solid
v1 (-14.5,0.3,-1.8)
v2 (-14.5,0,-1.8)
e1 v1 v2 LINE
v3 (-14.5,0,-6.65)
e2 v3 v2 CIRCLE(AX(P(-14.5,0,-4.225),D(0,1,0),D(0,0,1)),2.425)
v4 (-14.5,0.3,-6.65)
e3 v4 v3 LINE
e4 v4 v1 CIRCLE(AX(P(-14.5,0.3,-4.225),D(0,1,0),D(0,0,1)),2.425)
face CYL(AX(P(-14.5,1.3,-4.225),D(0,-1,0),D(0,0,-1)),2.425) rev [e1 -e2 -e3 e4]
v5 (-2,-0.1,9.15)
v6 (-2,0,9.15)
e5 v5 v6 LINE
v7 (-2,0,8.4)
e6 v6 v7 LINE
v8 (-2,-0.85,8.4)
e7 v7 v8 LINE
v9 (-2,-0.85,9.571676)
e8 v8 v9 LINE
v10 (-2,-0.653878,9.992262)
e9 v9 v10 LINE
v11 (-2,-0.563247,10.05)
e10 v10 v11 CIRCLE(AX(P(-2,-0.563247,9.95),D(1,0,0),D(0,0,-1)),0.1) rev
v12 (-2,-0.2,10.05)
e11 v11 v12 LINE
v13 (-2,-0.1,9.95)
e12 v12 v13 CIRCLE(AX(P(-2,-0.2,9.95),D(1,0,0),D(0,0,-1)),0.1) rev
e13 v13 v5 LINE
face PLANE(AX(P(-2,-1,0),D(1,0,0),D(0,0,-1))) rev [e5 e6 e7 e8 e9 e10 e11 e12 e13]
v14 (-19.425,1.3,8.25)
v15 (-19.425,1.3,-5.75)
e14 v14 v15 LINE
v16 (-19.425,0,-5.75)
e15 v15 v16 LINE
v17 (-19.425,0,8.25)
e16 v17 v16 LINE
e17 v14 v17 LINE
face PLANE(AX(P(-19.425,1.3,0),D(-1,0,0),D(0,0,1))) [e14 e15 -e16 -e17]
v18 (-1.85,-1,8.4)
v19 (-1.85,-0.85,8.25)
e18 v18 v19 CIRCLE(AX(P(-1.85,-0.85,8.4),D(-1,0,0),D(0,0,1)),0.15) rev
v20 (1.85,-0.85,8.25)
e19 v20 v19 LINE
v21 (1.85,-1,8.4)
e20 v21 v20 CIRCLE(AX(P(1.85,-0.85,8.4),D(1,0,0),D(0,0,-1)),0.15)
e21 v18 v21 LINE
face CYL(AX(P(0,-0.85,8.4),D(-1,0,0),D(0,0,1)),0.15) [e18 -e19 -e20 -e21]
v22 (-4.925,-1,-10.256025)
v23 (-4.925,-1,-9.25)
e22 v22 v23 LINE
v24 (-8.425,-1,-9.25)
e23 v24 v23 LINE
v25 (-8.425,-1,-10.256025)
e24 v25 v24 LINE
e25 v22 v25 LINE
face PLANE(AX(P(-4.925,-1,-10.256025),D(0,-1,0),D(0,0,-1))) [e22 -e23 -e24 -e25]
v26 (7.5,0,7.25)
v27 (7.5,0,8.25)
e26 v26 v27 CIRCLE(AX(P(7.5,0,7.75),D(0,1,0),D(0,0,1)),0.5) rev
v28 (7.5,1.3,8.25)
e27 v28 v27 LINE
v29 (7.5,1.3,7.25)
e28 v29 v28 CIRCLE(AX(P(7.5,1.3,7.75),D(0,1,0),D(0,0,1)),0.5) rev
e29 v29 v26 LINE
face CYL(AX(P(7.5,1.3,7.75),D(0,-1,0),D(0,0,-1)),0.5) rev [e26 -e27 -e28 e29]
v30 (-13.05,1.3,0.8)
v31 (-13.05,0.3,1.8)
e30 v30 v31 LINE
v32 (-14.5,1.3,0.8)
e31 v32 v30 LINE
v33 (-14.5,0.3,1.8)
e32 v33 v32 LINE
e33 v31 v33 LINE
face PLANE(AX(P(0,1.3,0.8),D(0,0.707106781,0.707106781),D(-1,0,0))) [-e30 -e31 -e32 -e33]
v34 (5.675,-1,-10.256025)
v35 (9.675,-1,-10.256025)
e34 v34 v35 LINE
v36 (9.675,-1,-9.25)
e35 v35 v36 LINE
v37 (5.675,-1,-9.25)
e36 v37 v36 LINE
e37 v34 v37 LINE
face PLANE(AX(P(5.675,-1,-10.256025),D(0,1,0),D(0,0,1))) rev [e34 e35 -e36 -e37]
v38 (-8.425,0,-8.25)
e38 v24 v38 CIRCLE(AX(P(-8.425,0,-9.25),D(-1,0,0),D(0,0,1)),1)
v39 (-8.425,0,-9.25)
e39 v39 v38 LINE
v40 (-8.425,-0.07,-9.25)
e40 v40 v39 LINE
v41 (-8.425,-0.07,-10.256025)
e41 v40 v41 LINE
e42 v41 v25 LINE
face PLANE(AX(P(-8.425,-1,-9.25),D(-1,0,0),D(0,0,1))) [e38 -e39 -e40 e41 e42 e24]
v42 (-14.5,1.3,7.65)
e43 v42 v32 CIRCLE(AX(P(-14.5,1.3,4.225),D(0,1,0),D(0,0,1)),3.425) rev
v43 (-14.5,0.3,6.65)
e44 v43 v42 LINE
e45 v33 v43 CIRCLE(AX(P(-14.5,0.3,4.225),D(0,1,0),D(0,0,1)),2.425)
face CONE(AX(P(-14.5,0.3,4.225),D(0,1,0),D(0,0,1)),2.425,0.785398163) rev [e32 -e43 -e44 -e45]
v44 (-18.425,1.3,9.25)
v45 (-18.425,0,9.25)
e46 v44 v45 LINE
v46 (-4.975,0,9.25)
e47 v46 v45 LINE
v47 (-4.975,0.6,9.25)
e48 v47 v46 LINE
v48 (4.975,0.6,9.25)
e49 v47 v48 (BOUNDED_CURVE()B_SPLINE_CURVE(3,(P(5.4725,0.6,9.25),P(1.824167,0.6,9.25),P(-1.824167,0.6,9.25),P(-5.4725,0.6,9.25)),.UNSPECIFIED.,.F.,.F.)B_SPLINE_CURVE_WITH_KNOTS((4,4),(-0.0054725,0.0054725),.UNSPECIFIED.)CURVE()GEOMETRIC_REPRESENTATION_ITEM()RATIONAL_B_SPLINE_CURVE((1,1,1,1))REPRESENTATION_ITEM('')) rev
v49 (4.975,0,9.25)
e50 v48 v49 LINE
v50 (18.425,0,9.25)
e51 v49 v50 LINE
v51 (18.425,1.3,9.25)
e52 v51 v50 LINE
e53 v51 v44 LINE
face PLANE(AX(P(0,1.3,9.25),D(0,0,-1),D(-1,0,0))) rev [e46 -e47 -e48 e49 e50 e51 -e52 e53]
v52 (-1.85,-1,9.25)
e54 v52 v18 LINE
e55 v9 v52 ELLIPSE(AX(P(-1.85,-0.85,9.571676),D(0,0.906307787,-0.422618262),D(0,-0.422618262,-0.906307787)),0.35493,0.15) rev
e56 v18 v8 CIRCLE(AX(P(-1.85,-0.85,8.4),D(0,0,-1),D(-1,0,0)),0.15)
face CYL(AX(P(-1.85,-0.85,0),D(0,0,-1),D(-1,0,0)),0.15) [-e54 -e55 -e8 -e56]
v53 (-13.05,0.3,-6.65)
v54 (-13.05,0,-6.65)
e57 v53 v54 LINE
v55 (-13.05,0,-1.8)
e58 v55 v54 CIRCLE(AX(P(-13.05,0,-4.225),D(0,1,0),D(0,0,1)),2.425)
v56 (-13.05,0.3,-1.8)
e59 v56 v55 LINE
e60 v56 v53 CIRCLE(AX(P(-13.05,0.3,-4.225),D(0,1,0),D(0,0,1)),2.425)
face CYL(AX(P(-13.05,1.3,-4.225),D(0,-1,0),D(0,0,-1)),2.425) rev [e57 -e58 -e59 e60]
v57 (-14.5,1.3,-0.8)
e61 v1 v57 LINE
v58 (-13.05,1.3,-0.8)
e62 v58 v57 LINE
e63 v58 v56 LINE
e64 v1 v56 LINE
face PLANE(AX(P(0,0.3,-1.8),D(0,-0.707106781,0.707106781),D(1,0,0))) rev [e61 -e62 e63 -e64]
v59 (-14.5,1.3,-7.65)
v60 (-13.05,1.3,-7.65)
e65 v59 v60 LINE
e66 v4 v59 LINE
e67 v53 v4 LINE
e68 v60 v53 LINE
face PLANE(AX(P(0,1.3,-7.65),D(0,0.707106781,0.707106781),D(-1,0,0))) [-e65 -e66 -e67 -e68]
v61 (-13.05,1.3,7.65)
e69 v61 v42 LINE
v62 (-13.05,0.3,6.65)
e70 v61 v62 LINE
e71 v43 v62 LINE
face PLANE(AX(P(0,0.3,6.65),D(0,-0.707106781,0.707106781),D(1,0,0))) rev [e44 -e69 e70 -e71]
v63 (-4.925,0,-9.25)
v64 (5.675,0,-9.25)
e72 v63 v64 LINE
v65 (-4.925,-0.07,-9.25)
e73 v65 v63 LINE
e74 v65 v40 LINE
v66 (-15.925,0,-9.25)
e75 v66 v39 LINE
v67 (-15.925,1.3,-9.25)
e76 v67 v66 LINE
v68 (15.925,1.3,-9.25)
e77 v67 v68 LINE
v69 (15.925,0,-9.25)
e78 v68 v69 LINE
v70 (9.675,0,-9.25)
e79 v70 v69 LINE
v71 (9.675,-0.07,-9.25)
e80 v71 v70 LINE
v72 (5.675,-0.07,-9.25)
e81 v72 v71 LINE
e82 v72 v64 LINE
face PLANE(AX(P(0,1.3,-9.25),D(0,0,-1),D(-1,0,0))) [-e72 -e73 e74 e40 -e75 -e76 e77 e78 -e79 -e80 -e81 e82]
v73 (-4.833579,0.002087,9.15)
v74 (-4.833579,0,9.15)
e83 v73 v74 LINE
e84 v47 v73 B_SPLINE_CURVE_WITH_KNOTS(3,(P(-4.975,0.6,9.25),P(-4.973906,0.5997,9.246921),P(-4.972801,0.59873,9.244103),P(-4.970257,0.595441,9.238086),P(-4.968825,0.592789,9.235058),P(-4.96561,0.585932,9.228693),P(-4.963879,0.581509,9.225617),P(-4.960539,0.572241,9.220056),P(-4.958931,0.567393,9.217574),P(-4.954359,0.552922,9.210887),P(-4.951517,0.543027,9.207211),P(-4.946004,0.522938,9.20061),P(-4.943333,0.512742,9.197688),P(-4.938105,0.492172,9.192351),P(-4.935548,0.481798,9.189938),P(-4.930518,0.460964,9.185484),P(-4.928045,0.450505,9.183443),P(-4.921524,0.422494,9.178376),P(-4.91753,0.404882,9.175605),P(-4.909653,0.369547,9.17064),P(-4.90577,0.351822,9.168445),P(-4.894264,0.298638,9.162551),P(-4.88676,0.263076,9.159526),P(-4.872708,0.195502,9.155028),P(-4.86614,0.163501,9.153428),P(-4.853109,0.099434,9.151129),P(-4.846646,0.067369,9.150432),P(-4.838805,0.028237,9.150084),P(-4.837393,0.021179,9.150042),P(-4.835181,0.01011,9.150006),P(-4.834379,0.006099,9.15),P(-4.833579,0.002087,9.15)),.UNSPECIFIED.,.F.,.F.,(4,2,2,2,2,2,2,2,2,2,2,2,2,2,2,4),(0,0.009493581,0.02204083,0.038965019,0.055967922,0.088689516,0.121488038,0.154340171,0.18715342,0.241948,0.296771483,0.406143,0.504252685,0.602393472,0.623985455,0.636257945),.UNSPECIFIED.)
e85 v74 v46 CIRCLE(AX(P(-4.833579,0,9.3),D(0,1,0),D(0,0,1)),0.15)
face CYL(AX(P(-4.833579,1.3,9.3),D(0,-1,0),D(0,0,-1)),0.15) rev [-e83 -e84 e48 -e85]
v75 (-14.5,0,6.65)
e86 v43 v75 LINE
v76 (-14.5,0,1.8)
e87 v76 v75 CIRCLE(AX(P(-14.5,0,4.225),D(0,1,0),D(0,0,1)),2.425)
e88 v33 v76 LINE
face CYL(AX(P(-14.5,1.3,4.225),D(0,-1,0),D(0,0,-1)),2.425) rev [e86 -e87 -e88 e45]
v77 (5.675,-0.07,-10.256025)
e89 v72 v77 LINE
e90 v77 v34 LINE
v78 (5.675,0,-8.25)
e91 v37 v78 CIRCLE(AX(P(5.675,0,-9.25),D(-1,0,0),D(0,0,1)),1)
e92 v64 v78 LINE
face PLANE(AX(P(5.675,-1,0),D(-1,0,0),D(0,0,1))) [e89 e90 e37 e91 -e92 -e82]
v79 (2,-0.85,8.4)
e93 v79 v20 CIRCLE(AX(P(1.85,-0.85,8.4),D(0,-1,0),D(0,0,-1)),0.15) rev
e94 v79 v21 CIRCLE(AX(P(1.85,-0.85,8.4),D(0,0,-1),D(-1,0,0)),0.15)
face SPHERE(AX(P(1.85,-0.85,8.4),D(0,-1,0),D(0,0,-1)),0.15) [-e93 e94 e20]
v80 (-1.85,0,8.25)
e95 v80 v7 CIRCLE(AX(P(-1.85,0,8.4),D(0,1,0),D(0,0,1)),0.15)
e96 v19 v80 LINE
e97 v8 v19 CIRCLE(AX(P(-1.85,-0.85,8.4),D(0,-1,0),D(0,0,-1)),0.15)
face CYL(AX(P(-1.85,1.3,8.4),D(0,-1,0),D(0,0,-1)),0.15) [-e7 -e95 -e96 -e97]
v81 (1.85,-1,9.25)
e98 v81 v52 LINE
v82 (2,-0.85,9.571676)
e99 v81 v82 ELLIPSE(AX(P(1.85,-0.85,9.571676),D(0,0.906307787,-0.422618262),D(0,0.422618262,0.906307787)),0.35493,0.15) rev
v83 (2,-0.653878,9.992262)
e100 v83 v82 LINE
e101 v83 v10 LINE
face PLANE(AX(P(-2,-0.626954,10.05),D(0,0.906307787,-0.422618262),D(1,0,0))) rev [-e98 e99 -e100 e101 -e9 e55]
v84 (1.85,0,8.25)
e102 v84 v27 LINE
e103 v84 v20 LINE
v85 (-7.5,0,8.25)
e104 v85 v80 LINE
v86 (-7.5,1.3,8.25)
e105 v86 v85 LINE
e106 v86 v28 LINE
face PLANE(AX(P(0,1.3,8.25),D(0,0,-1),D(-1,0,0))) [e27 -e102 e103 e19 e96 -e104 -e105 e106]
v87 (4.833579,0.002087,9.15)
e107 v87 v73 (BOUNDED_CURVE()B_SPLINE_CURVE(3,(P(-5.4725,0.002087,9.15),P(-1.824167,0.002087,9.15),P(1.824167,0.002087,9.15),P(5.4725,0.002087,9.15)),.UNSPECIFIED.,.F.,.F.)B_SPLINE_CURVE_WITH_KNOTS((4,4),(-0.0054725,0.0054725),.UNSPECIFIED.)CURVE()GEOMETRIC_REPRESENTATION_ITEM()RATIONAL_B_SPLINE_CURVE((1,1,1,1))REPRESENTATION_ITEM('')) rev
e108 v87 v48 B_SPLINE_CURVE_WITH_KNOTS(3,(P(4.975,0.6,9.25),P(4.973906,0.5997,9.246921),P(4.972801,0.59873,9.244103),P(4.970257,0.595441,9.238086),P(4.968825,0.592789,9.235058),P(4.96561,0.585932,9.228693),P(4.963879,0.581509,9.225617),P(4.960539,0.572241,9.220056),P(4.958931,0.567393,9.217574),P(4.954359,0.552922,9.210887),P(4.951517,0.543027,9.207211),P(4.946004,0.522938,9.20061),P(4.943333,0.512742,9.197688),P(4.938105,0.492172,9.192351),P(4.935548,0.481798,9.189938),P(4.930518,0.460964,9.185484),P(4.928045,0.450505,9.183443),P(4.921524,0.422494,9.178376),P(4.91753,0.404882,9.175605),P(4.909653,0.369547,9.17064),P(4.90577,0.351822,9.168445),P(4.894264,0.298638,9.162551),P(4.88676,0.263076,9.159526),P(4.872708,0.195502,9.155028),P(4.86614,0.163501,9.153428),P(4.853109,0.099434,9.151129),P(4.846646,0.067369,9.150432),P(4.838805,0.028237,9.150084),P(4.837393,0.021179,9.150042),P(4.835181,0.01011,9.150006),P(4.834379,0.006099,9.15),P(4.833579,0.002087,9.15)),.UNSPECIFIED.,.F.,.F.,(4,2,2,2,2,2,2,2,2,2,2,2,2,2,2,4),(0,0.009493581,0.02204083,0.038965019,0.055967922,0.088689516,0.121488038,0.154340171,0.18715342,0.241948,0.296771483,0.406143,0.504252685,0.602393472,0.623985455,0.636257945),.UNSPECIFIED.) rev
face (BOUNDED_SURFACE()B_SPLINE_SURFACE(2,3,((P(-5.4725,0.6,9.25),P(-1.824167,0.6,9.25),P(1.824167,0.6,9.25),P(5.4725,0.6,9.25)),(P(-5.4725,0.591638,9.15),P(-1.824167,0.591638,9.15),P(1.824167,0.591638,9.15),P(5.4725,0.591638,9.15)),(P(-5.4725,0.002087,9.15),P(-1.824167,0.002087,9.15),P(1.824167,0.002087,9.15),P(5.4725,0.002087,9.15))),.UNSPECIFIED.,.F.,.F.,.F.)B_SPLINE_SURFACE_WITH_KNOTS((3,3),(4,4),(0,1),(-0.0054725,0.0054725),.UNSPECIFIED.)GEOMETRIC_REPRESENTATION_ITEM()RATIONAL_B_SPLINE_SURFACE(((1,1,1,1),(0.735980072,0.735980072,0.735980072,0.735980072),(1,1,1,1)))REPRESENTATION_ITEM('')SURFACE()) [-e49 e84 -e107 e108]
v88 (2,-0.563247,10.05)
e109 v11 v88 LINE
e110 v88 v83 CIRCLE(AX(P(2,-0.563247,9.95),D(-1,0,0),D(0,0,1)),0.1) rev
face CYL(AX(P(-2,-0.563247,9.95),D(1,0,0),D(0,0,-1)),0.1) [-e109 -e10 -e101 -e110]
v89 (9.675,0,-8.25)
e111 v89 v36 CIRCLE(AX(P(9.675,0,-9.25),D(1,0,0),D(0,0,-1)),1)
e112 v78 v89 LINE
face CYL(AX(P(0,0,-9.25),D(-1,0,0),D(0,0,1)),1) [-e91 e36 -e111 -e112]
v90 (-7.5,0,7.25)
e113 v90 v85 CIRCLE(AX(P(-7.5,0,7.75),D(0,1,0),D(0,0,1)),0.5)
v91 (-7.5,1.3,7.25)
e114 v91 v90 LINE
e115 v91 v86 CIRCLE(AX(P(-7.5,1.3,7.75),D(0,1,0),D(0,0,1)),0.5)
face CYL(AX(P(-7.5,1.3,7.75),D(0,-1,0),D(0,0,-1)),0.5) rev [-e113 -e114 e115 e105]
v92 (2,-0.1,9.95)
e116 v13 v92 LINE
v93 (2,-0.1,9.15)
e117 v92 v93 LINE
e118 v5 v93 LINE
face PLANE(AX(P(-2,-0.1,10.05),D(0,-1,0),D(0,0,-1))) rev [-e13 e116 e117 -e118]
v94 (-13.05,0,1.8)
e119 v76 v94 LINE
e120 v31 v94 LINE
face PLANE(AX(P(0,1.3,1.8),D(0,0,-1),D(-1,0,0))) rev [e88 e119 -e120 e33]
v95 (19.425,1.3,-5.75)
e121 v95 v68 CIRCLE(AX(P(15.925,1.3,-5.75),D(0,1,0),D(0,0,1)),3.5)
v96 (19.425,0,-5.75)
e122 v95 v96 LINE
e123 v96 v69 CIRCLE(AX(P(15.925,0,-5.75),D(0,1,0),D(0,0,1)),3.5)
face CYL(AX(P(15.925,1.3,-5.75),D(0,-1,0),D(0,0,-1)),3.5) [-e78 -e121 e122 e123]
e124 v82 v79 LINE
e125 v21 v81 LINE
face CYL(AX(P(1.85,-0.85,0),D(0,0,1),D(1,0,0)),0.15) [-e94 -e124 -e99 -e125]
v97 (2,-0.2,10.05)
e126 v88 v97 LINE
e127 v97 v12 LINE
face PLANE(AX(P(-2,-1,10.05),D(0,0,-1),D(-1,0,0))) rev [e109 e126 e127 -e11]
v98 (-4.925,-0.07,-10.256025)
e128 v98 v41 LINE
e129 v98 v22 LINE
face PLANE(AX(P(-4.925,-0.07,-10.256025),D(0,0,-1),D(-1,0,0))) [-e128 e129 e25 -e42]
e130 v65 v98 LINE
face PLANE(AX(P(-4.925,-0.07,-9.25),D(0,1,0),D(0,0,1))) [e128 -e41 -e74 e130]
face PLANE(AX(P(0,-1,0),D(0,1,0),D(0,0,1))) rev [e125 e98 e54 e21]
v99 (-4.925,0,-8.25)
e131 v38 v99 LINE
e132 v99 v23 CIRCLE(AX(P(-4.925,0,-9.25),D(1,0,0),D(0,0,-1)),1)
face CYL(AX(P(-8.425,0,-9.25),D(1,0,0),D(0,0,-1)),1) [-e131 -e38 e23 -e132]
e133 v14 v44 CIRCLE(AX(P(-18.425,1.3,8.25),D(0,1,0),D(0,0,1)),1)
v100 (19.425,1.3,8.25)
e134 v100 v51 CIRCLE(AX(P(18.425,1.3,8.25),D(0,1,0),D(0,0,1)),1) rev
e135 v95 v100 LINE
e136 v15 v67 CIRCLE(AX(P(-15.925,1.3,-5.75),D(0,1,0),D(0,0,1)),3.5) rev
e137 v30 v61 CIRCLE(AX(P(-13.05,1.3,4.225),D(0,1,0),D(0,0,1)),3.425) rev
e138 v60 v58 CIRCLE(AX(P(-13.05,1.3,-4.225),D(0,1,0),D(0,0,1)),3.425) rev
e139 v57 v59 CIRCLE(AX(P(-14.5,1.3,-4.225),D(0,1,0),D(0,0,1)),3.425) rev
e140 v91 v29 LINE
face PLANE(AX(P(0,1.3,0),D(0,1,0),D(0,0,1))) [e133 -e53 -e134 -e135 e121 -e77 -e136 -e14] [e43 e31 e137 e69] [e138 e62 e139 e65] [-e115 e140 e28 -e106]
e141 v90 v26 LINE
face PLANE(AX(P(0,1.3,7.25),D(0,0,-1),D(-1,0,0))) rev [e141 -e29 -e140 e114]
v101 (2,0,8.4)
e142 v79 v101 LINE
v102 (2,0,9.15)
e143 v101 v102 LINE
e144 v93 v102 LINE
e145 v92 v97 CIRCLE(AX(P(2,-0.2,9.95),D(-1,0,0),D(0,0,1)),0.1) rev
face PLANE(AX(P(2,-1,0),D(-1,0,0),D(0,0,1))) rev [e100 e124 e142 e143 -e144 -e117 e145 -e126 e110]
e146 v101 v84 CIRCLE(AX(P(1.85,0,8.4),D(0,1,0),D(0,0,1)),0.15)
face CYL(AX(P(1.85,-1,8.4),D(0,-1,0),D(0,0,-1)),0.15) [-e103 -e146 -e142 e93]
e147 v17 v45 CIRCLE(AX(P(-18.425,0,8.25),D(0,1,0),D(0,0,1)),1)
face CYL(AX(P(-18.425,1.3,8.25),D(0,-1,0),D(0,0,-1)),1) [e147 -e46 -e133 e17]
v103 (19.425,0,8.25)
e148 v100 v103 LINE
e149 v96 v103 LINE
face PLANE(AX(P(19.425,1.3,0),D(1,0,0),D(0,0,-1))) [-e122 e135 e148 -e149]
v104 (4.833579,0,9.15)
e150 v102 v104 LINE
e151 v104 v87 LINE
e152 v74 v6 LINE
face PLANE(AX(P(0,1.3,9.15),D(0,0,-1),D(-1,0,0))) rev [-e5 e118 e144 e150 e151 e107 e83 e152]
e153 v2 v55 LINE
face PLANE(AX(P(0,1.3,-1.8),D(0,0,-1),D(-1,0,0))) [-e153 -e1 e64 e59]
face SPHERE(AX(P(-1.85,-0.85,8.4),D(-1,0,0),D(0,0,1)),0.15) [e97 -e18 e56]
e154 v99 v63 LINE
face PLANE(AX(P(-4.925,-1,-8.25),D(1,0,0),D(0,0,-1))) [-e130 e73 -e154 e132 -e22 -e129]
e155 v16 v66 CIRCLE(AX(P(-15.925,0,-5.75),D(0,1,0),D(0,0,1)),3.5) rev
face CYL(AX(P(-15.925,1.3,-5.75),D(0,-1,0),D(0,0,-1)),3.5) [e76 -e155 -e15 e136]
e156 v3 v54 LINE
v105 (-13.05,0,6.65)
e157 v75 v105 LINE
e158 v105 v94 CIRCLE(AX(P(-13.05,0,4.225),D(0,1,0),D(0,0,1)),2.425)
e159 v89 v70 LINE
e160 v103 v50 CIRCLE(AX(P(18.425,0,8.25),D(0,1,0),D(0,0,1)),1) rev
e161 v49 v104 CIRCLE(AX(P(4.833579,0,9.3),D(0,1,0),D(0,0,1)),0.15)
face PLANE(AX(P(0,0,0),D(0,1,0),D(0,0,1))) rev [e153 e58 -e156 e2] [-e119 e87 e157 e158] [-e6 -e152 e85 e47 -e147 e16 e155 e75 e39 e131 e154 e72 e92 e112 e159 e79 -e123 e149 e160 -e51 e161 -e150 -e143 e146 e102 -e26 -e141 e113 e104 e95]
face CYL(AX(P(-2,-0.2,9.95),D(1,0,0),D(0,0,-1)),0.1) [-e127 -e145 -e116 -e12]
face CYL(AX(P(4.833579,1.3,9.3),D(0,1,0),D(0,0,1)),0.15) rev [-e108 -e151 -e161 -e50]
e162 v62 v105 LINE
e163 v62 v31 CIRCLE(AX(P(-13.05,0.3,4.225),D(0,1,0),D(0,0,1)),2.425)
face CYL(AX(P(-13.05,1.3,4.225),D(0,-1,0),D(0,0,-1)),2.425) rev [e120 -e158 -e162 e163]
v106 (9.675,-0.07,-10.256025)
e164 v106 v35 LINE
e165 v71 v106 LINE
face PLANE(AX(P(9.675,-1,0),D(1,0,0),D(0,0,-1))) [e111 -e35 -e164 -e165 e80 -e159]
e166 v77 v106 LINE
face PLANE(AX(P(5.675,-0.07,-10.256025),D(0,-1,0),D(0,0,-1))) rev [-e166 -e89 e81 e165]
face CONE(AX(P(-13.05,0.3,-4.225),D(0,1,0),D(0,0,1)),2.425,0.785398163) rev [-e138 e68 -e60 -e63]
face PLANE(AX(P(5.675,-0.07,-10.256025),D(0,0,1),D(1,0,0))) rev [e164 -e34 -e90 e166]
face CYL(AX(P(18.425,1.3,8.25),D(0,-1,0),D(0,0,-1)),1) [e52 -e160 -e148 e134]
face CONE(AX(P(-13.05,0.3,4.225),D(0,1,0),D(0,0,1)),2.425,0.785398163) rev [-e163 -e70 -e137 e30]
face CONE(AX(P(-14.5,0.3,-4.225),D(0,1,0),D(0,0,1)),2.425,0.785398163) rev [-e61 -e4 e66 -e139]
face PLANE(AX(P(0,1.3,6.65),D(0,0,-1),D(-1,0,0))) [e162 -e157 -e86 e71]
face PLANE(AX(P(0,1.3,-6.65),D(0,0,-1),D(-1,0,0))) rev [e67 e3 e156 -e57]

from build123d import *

# Parameters (mm, degrees)
SKETCH1_W           = 3.5
SKETCH1_H           = 1
SKETCH1_W_2         = 4
BOSS_EXTRUDE1_DEPTH = 1.3
SKETCH1_7_W         = 3.5
SKETCH1_7_H         = 1
BOSS_EXTRUDE3_DEPTH = 1
SKETCH1_8_W         = 4
SKETCH1_8_H         = 1
BOSS_EXTRUDE4_DEPTH = 1
FILLET2_R           = 1
SKETCH5_W           = 1.00602476
SKETCH5_H           = 0.93
BOSS_EXTRUDE5_DEPTH = 4
SKETCH7_W           = 1.00602476
SKETCH7_H           = 0.93
BOSS_EXTRUDE6_DEPTH = 3.5
BOSS_EXTRUDE7_DEPTH = 1
BOSS_EXTRUDE8_START = 1.3
BOSS_EXTRUDE8_DEPTH = 0.7
FILLET6_START       = -4.975
FILLET6_DEPTH       = 9.95
FILLET7_R           = 0.15
SKETCH10_W          = 0.9
SKETCH10_H          = 0.9
BOSS_EXTRUDE9_DEPTH = 4
CHAMFER2_SIZE       = 0.8
CHAMFER2_SIZE2      = 0.373046127
FILLET9_R           = 0.15
FILLET10_R          = 0.1
CHAMFER5_SIZE       = 1


with BuildPart() as part:
    # Sketch1 → Boss-Extrude1 (new body)
    # profile 1 of 4: a face of its own
    with BuildSketch(Plane(origin=(0, 0, 0), x_dir=(1, 0, 0), z_dir=(0, 1, 0))):
        with BuildLine():
            Line((0, 9.25), (-4.925, 9.25))
            Line((-4.925, 9.25), (-4.925, 8.25))
            Line((-4.925, 8.25), (-8.425, 8.25))
            Line((-8.425, 8.25), (-8.425, 9.25))
            Line((-8.425, 9.25), (-15.925, 9.25))
            ThreePointArc((-15.925, 9.25), (-18.399873734, 8.224873734), (-19.425, 5.75))
            Line((-19.425, 5.75), (-19.425, -8.25))
            ThreePointArc((-19.425, -8.25), (-19.132106781, -8.957106781), (-18.425, -9.25))
            Line((-18.425, -9.25), (-8, -9.25))
            Line((-8, -9.25), (-4.975, -9.25))
            Line((-4.975, -9.25), (-4.975, -9.15))
            Line((-4.975, -9.15), (-2, -9.15))
            Line((-2, -9.15), (-2, -8.75))
            Line((-2, -8.75), (-2, -8.25))
            Line((-2, -8.25), (-7.5, -8.25))
            ThreePointArc((-7.5, -8.25), (-8, -7.75), (-7.5, -7.25))
            Line((-7.5, -7.25), (7.5, -7.25))
            ThreePointArc((7.5, -7.25), (8, -7.75), (7.5, -8.25))
            Line((7.5, -8.25), (2, -8.25))
            Line((2, -8.25), (2, -8.75))
            Line((2, -8.75), (2, -9.15))
            Line((2, -9.15), (4.975, -9.15))
            Line((4.975, -9.15), (4.975, -9.25))
            Line((4.975, -9.25), (8, -9.25))
            Line((8, -9.25), (18.425, -9.25))
            ThreePointArc((18.425, -9.25), (19.132106781, -8.957106781), (19.425, -8.25))
            Line((19.425, -8.25), (19.425, 5.75))
            ThreePointArc((19.425, 5.75), (18.399873734, 8.224873734), (15.925, 9.25))
            Line((15.925, 9.25), (9.675, 9.25))
            Line((9.675, 9.25), (9.675, 8.25))
            Line((9.675, 8.25), (5.675, 8.25))
            Line((5.675, 8.25), (5.675, 9.25))
            Line((5.675, 9.25), (0, 9.25))
        make_face()
        with BuildLine():
            Line((-13.05, -6.65), (-14.5, -6.65))
            ThreePointArc((-14.5, -6.65), (-16.214733944, -5.939733944), (-16.925, -4.225))
            ThreePointArc((-16.925, -4.225), (-16.214733944, -2.510266056), (-14.5, -1.8))
            Line((-14.5, -1.8), (-13.05, -1.8))
            ThreePointArc((-13.05, -1.8), (-11.335266056, -2.510266056), (-10.625, -4.225))
            ThreePointArc((-10.625, -4.225), (-11.335266056, -5.939733944), (-13.05, -6.65))
        make_face(mode=Mode.SUBTRACT)
        with BuildLine():
            ThreePointArc((-16.925, 4.225), (-16.214733944, 5.939733944), (-14.5, 6.65))
            Line((-14.5, 6.65), (-13.05, 6.65))
            ThreePointArc((-13.05, 6.65), (-11.335266056, 5.939733944), (-10.625, 4.225))
            ThreePointArc((-10.625, 4.225), (-11.335266056, 2.510266056), (-13.05, 1.8))
            Line((-13.05, 1.8), (-14.5, 1.8))
            ThreePointArc((-14.5, 1.8), (-16.214733944, 2.510266056), (-16.925, 4.225))
        make_face(mode=Mode.SUBTRACT)
    # profile 2 of 4: a face of its own
    with BuildSketch(Plane(origin=(0, 0, 0), x_dir=(1, 0, 0), z_dir=(0, 1, 0))):
        with Locations((-6.675, 8.75)):
            Rectangle(SKETCH1_W, SKETCH1_H)
    # profile 3 of 4: a face of its own
    with BuildSketch(Plane(origin=(0, 0, 0), x_dir=(1, 0, 0), z_dir=(0, 1, 0))):
        with Locations((7.675, 8.75)):
            Rectangle(SKETCH1_W_2, SKETCH1_H)
    # profile 4 of 4: a face of its own
    with BuildSketch(Plane(origin=(0, 0, 0), x_dir=(1, 0, 0), z_dir=(0, 1, 0))):
        Polygon((-2, -8.75), (-2, -9.15), (2, -9.15), (2, -8.75), (2, -8.25), (-2, -8.25), align=None)
    extrude(amount=BOSS_EXTRUDE1_DEPTH)

    # Sketch1<7> → Boss-Extrude3 (add)
    with BuildSketch(Plane(origin=(0, 0, 0), x_dir=(1, 0, 0), z_dir=(0, 1, 0))):
        with Locations((-6.675, 8.75)):
            Rectangle(SKETCH1_7_W, SKETCH1_7_H)
    extrude(amount=-BOSS_EXTRUDE3_DEPTH)

    # Sketch1<8> → Boss-Extrude4 (add)
    with BuildSketch(Plane(origin=(0, 0, 0), x_dir=(1, 0, 0), z_dir=(0, 1, 0))):
        with Locations((7.675, 8.75)):
            Rectangle(SKETCH1_8_W, SKETCH1_8_H)
    extrude(amount=-BOSS_EXTRUDE4_DEPTH)

    # Fillet2
    fillet2_edges = [part.edges().sort_by_distance(p)[0] for p in [
        (7.675, -1, -8.25),
        (-6.675, -1, -8.25),
    ]]
    fillet(fillet2_edges, radius=FILLET2_R - 0.0001)  # a hair under: the kernel refuses the full size

    # Sketch5 → Boss-Extrude5 (add)
    with BuildSketch(Plane.ZY.offset(-9.675)):
        with Locations((-9.75301238, -0.535)):
            Rectangle(SKETCH5_W, SKETCH5_H)
    extrude(amount=BOSS_EXTRUDE5_DEPTH)

    # Sketch7 → Boss-Extrude6 (add)
    with BuildSketch(Plane.ZY.offset(8.425)):
        with Locations((-9.75301238, -0.535)):
            Rectangle(SKETCH7_W, SKETCH7_H)
    extrude(amount=-BOSS_EXTRUDE6_DEPTH)

    # Sketch1<12> → Boss-Extrude7 (add)
    with BuildSketch(Plane(origin=(0, 0, 0), x_dir=(1, 0, 0), z_dir=(0, 1, 0))):
        Polygon((-2, -8.75), (-2, -9.15), (2, -9.15), (2, -8.75), (2, -8.25), (-2, -8.25), align=None)
    extrude(amount=-BOSS_EXTRUDE7_DEPTH)

    # Sketch1<13> → Boss-Extrude8 (add)
    with BuildSketch(Plane(origin=(0, 0, 0), x_dir=(1, 0, 0), z_dir=(0, 1, 0)).offset(BOSS_EXTRUDE8_START)):
        Polygon((-4.975, -9.15), (-4.975, -9.25), (0, -9.25), (4.975, -9.25), (4.975, -9.15), (2, -9.15), (-2, -9.15), align=None)
    extrude(amount=-BOSS_EXTRUDE8_DEPTH)

    # Fillet6: read off the stored shape, not the designer's step
    # Fillet6 outline → Fillet6 (add)
    with BuildSketch(Plane.YZ.offset(FILLET6_START)):
        with BuildLine():
            Line((0.6, 9.15), (0.6, 9.25))
            add(Edge.make_bspline(
                [(0.6, 9.25), (0.59163758, 9.15), (0.002086963, 9.15)],
                knots=[0, 0, 0, 1, 1, 1], degree=2, weights=[1, 0.735980072, 1]))
            Line((0.002086963, 9.15), (0.6, 9.15))
        make_face()
    extrude(amount=FILLET6_DEPTH)

    # Fillet7
    # the kernel refuses this fillet: 0.15 mm, written as the material it adds along each edge
    with BuildSketch(Plane(origin=(-4.975, 0, 9.15), x_dir=(1, 0, 0), z_dir=(0, 1, 0))) as fillet7_piece_1:
        with BuildLine():
            CenterArc((0.141421356, -0.15), FILLET7_R, 90, 70.528779366)
            Line((0, -0.1), (-0.002828427, -0.099))
            ThreePointArc((-0.002828427, -0.099), (-0.003, -0.05), (-0.003, 0))
            Line((-0.003, 0), (0, 0.003))
            Line((0, 0.003), (0.141421356, 0.003))
            Line((0.141421356, 0.003), (0.141421356, 0))
        make_face()
    extrude(amount=0.603127727)
    with BuildSketch(Plane(origin=(4.975, 0, 9.15), x_dir=(0, 0, 1), z_dir=(0, 1, 0))) as fillet7_piece_2:
        with BuildLine():
            CenterArc((0.15, -0.141421356), FILLET7_R, 109.471220634, 70.528779366)
            Line((0, -0.141421356), (-0.003, -0.141421356))
            Line((-0.003, -0.141421356), (-0.003, 0))
            Line((-0.003, 0), (0, 0.003))
            ThreePointArc((0, 0.003), (0.05, 0.003), (0.099, 0.002828427))
            Line((0.099, 0.002828427), (0.1, 0))
        make_face()
    extrude(amount=0.603127727)

    # Sketch10 → Boss-Extrude9 (add)
    with BuildSketch(Plane(origin=(2, 0, 0), x_dir=(0, 0, -1), z_dir=(1, 0, 0))):
        with Locations((-9.6, -0.55)):
            Rectangle(SKETCH10_W, SKETCH10_H)
    extrude(amount=-BOSS_EXTRUDE9_DEPTH)

    # Chamfer2
    chamfer2_edges = [part.edges().sort_by_distance(p)[0] for p in [
        (0, -1, 10.05),
    ]]
    chamfer2_side = [part.faces().sort_by_distance(p)[0] for p in [
        (0, -1, 9.15),
    ]]
    chamfer(chamfer2_edges, length=CHAMFER2_SIZE, length2=CHAMFER2_SIZE2, reference=chamfer2_side[0])

    # Fillet9
    fillet9_edges = [part.edges().sort_by_distance(p)[0] for p in [
        (-2, -0.5, 8.25),
        (2, -0.5, 8.25),
        (0, -1, 8.25),
        (2, -1, 8.75),
        (-2, -1, 8.75),
    ]]
    fillet(fillet9_edges, radius=FILLET9_R)

    # Fillet10
    fillet10_edges = [part.edges().sort_by_distance(p)[0] for p in [
        (0, -0.1, 10.05),
        (0, -0.626953873, 10.05),
    ]]
    fillet(fillet10_edges, radius=FILLET10_R)

    # Chamfer5
    chamfer5_edges = [part.edges().sort_by_distance(p)[0] for p in [
        (-10.625, 1.3, -4.225),
        (-13.775, 1.3, -1.8),
        (-16.925, 1.3, -4.225),
        (-13.775, 1.3, -6.65),
        (-16.925, 1.3, 4.225),
        (-13.775, 1.3, 1.8),
        (-10.625, 1.3, 4.225),
        (-13.775, 1.3, 6.65),
    ]]
    chamfer(chamfer5_edges, length=CHAMFER5_SIZE)


solid = part.part
